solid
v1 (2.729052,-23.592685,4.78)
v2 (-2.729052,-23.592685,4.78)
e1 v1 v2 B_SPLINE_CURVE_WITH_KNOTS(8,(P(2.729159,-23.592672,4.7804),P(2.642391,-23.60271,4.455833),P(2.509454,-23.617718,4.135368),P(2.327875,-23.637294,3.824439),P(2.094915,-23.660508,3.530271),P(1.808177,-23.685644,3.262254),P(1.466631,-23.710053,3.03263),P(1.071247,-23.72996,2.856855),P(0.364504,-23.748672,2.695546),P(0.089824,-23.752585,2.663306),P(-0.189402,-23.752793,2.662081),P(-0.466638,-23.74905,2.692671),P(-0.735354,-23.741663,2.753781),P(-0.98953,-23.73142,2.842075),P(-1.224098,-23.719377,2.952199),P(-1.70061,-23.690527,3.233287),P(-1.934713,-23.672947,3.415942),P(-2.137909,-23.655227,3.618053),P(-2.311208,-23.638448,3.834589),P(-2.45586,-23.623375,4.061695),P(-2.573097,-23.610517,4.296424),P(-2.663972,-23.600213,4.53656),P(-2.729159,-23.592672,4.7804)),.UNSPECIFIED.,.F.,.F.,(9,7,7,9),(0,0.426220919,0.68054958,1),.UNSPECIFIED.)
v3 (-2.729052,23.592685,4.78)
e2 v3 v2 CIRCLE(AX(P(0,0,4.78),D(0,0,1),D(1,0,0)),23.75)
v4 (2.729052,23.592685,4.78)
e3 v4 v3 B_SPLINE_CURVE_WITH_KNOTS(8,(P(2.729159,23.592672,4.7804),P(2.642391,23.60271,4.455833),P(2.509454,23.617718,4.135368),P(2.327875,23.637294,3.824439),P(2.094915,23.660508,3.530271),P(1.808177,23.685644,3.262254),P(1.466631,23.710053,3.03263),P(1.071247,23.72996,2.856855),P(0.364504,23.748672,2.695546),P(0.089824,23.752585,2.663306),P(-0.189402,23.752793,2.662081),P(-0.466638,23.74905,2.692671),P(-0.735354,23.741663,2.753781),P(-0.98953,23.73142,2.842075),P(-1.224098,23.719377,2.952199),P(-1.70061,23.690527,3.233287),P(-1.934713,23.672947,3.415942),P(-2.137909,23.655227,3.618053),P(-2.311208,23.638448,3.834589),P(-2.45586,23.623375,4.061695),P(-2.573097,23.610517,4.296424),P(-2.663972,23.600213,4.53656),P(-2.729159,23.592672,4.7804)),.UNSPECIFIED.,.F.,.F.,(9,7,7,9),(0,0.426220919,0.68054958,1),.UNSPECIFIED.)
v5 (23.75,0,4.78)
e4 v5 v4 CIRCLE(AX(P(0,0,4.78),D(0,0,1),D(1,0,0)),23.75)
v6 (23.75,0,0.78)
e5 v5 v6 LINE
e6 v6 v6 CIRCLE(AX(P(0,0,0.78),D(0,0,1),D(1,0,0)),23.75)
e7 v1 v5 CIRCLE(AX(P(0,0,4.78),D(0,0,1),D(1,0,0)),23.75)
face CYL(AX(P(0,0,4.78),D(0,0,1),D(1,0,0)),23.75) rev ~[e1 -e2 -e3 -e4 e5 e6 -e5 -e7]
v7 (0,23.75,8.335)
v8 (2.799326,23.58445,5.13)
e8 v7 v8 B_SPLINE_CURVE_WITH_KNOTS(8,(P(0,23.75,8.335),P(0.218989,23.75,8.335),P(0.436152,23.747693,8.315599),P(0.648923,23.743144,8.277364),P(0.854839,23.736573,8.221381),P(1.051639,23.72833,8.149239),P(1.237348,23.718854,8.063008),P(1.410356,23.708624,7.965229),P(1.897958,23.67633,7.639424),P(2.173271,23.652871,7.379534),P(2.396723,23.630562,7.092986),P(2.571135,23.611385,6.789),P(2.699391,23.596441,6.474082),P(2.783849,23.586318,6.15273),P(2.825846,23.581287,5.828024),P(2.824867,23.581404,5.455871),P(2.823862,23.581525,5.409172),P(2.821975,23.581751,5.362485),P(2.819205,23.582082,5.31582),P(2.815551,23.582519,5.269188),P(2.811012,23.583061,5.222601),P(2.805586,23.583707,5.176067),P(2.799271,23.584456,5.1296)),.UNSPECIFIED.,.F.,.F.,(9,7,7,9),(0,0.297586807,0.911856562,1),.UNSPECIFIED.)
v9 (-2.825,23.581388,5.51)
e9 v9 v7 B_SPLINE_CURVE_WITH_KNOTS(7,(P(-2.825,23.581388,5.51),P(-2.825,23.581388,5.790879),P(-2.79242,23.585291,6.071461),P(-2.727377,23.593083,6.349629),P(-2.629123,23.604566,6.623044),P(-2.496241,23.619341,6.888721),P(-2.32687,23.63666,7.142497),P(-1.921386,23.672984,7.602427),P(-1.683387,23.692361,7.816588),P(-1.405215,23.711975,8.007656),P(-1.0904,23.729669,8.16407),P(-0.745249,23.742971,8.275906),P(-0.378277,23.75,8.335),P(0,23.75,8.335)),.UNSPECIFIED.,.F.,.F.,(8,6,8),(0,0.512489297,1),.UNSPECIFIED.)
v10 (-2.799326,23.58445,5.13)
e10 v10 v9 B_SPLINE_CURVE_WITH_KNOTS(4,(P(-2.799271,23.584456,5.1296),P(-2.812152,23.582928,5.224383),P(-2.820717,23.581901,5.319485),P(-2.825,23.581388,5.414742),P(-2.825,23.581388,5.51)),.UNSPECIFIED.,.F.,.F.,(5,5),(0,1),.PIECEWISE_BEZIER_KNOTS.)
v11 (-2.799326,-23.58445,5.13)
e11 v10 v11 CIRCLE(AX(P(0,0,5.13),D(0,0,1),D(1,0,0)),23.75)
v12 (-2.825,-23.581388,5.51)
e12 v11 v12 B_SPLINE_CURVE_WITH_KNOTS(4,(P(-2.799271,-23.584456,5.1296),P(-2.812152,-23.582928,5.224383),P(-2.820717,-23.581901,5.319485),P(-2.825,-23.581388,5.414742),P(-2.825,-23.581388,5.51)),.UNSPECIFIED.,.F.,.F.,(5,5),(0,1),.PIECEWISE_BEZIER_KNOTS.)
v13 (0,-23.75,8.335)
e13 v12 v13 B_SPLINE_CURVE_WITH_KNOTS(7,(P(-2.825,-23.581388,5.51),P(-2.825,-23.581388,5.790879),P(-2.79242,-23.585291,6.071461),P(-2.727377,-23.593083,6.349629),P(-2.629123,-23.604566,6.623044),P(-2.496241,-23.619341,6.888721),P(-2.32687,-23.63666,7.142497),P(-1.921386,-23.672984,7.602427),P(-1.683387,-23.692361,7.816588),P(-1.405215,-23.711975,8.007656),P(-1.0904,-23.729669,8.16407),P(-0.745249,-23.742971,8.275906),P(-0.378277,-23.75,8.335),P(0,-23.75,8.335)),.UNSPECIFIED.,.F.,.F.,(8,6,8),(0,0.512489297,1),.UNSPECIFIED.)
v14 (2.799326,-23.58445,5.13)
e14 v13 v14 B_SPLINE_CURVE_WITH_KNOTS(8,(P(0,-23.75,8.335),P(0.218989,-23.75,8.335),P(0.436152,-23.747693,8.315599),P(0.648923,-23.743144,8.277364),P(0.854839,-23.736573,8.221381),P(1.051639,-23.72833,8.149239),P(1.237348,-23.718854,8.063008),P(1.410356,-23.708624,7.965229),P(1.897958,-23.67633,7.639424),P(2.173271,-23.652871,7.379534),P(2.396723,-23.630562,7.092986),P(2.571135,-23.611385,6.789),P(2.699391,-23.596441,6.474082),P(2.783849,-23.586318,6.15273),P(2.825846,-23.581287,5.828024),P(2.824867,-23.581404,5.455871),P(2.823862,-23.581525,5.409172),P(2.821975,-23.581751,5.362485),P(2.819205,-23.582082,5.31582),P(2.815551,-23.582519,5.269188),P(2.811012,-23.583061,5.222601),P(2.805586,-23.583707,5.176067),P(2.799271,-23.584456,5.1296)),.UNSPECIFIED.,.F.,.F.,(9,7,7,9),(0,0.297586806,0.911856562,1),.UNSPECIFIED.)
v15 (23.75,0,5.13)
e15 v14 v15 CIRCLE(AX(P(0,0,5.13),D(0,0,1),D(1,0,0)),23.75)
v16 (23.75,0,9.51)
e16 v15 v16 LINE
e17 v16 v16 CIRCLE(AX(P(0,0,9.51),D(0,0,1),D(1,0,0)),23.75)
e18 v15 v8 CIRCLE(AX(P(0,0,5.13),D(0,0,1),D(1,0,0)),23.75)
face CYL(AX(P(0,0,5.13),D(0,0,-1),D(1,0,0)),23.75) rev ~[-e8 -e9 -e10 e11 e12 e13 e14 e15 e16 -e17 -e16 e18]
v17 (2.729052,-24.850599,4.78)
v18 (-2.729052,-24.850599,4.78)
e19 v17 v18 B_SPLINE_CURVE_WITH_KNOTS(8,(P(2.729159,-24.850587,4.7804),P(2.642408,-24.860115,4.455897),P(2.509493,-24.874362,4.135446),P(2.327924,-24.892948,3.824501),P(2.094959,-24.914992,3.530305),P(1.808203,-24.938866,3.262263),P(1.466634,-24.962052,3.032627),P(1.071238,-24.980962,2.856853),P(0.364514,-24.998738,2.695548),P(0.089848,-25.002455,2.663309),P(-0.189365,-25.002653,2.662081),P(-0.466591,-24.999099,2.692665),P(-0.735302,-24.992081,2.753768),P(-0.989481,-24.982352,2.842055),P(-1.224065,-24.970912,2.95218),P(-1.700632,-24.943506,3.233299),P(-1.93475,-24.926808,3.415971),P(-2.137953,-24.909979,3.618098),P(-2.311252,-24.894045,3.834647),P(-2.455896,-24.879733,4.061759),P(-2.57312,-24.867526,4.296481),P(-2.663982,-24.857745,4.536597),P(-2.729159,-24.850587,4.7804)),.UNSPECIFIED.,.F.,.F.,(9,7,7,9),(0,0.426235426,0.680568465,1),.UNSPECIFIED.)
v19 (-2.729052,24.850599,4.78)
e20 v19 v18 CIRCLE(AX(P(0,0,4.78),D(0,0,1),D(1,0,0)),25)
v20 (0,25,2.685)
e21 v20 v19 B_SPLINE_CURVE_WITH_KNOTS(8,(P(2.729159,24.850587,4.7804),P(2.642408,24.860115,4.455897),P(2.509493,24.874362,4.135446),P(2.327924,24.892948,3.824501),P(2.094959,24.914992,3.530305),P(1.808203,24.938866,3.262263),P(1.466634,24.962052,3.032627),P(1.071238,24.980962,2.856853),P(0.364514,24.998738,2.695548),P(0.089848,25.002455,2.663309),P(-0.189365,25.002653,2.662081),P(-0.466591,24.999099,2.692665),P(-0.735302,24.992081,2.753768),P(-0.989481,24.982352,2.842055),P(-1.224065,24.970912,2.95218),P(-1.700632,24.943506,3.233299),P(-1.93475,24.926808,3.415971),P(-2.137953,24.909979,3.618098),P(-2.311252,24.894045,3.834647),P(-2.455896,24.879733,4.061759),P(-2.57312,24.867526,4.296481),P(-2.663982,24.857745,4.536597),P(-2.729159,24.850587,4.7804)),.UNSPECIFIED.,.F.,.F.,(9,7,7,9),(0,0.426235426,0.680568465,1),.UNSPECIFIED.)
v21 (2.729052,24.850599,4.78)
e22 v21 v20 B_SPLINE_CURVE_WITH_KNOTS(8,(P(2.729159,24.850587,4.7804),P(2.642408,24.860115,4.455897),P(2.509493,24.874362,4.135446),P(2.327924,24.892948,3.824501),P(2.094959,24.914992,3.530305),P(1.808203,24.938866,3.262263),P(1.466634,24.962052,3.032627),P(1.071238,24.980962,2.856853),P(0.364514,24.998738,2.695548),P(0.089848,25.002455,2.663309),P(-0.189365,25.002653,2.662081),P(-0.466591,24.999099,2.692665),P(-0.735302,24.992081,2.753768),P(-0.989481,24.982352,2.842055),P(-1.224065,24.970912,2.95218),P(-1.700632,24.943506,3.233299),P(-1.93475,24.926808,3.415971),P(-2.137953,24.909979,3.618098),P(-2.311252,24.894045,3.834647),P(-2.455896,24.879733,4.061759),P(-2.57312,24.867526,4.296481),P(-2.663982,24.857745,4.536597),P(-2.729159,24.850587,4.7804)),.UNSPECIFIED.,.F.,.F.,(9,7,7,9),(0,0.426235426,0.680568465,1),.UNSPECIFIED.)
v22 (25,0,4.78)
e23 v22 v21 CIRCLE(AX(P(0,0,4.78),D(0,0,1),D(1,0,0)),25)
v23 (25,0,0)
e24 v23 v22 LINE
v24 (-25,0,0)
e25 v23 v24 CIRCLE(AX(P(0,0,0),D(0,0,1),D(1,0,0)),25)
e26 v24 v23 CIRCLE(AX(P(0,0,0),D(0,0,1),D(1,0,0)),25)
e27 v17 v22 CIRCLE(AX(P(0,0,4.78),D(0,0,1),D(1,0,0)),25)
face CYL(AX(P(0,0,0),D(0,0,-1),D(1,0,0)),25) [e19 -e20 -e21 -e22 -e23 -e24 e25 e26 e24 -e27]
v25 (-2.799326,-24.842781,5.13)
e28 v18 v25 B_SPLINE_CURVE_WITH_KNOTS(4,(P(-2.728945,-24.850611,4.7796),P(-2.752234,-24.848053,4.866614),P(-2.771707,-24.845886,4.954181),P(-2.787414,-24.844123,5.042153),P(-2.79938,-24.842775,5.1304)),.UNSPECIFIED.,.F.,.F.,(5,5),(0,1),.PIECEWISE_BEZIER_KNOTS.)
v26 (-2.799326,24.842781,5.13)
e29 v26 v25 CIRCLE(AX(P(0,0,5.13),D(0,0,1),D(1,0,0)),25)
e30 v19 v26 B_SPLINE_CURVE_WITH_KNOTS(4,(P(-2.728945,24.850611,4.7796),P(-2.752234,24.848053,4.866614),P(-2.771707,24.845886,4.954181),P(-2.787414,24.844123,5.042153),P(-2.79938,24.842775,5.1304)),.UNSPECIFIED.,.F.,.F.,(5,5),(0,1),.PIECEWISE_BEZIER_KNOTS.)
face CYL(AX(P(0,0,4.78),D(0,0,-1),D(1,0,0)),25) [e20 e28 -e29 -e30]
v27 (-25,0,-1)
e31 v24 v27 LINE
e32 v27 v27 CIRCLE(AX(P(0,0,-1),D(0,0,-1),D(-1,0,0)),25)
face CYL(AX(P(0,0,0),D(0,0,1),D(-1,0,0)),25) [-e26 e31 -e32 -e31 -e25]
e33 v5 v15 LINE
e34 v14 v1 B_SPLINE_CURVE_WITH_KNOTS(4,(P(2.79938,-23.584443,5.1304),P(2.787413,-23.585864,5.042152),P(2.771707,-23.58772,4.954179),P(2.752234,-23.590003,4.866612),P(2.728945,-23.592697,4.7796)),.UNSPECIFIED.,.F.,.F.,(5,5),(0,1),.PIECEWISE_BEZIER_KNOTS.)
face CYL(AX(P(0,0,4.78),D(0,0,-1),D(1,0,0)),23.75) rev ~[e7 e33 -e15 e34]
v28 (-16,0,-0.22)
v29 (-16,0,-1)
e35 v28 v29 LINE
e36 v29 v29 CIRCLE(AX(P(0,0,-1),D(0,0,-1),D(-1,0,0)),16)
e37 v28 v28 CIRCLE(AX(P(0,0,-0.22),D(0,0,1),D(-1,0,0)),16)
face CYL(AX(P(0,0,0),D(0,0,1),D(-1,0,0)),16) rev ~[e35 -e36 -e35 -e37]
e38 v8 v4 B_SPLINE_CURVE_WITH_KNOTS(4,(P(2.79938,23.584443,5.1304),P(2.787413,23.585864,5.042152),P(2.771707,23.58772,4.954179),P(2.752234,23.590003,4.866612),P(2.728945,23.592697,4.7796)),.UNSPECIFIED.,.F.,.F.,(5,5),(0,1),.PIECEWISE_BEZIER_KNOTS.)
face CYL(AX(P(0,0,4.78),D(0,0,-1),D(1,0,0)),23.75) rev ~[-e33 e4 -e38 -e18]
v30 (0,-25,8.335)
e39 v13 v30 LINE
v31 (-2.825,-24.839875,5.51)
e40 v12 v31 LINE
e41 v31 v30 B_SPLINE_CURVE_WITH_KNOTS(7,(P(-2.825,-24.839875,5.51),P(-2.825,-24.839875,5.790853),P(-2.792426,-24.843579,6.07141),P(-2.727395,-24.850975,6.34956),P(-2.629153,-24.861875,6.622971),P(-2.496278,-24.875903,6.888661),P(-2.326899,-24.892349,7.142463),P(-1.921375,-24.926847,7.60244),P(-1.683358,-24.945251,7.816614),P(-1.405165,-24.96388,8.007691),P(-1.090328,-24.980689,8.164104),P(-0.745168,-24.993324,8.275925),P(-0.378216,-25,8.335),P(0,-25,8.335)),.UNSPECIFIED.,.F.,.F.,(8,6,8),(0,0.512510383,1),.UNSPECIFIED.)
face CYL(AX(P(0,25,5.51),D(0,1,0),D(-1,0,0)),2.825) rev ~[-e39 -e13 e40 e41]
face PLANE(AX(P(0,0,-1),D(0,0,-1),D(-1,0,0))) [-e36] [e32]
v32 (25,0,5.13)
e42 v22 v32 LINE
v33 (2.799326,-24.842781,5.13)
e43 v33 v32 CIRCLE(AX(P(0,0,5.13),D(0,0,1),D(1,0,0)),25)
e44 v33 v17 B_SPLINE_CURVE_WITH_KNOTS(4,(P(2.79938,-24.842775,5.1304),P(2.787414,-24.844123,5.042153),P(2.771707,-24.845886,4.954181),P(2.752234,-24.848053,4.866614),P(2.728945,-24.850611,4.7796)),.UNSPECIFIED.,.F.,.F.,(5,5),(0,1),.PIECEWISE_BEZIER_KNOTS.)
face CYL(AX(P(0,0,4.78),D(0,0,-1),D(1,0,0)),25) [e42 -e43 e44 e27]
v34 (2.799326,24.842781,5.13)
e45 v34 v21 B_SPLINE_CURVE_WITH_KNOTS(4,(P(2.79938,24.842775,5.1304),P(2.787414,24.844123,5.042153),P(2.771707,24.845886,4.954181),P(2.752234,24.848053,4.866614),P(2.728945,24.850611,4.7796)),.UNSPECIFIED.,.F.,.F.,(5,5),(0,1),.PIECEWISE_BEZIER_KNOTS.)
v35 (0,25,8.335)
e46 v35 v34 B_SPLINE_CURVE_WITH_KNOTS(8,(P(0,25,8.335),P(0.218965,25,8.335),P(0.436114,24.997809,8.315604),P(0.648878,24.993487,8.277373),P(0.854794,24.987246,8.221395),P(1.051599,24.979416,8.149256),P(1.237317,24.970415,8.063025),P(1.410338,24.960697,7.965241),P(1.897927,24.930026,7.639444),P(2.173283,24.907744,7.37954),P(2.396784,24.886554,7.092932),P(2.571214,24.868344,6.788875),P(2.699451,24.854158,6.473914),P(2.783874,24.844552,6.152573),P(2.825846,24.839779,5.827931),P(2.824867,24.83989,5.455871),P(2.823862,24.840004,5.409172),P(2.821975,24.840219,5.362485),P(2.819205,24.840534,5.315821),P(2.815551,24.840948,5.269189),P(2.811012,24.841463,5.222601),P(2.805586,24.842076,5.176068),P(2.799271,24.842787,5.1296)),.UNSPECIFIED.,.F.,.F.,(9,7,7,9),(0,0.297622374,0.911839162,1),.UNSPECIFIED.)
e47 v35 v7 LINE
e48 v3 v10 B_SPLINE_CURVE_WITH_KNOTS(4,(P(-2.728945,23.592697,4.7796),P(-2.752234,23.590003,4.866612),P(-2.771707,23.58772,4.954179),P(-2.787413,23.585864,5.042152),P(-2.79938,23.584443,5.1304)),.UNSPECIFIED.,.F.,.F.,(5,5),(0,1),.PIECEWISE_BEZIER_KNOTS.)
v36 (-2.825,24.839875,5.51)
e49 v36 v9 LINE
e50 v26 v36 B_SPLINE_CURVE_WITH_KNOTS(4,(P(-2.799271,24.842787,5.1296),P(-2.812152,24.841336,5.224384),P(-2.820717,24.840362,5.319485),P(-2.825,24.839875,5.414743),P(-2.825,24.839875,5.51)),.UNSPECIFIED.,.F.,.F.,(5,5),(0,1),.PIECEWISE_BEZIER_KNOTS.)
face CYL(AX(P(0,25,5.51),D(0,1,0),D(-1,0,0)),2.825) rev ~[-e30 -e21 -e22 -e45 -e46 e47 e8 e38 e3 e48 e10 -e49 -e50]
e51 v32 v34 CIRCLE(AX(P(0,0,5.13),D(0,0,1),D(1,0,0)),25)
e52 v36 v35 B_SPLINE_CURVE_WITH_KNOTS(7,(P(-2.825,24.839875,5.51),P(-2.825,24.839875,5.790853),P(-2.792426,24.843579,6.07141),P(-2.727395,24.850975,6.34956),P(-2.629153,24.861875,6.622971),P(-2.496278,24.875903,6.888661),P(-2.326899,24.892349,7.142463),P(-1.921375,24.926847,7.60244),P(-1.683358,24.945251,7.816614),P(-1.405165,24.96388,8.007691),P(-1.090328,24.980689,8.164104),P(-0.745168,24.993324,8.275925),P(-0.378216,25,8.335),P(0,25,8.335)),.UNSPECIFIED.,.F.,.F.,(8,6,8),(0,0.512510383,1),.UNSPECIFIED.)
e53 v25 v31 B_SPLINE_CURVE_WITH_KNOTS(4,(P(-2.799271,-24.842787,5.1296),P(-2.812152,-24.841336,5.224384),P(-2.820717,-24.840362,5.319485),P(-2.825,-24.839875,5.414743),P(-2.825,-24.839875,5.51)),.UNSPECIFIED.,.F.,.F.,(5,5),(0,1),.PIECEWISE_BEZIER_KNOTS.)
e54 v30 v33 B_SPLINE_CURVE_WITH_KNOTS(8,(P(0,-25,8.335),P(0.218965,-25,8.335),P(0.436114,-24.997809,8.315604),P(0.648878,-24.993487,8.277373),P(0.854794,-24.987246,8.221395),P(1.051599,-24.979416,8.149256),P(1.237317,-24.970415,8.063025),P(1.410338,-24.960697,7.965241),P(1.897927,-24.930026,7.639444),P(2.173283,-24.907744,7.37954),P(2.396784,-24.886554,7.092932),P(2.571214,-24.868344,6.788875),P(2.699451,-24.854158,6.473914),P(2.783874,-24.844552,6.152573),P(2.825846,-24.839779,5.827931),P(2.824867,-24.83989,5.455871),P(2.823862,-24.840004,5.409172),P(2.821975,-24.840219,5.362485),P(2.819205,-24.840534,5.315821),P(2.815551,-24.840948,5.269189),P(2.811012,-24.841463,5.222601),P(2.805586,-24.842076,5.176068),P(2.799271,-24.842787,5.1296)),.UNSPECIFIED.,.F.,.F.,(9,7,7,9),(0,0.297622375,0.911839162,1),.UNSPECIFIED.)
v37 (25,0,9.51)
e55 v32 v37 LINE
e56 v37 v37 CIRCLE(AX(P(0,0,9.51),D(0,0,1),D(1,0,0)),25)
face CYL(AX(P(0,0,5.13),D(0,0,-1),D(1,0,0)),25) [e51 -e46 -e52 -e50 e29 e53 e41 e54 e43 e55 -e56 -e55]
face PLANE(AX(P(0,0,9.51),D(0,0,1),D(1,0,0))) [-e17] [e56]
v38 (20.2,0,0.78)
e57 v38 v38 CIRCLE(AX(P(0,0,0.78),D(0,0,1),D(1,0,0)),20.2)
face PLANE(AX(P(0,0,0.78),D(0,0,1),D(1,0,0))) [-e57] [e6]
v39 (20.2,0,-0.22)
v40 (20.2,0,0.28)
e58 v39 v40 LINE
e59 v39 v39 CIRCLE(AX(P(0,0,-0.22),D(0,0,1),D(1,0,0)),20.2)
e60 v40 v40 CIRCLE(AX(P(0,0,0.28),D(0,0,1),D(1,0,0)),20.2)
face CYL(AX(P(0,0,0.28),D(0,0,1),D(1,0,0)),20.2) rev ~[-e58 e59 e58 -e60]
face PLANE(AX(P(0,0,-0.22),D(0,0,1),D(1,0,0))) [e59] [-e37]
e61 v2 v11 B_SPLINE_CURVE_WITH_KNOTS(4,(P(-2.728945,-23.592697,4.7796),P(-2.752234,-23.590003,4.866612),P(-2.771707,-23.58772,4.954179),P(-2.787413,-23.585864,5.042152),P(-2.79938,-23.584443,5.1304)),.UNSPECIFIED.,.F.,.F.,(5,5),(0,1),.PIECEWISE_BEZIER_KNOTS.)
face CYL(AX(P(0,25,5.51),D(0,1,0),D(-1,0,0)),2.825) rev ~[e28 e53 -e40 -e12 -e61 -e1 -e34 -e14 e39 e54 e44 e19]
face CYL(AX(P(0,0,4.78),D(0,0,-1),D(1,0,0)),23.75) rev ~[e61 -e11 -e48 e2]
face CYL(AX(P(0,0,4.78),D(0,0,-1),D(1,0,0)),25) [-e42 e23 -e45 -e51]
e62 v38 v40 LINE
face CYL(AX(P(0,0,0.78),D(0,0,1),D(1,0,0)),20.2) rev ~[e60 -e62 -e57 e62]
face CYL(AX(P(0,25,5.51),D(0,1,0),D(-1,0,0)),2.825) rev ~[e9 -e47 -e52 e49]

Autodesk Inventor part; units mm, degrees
ref_plane "YZ Plane" through (0, 0, 0) normal (1, 0, 0) x (0, 1, 0)
ref_plane "XY Plane" through (0, 0, 0) normal (0, 0, 1) x (1, 0, 0)
sketch "Sketch1" plane through (0, 0, 0) normal (0, 0, 1) x (1, 0, 0)
  circle A0 centre (0, 0) radius 25
  dimension "d0" = 50
extrude "Initial Cylinder" add sketch "Sketch1" along normal blind 4.78
sketch "Sketch2" plane through (0, 0, 4.78) normal (0, 0, 1) x (1, 0, 0)
  circle A0 centre (0, 0) radius 16
  dimension "d3" = 32
extrude "Through-hole" cut sketch "Sketch2" against normal blind 548
sketch "Sketch3" plane through (0, 0, 4.78) normal (0, 0, 1) x (1, 0, 0)
  circle A0 centre (0, 0) radius 23.75
  dimension "d6" = 47.5
extrude "snug ring fit" cut sketch "Sketch3" against normal blind 4
sketch "Sketch5" plane through (0, 0, 0) normal (0, 1, 0) x (-1, 0, 0)
  line L0 (25, 4.78) -> (-25, 4.78) projected
  line L1 (25, 0) -> (-25, 0) projected
  point P0 (0, 0)
  dimension "d16" = 4.78
sketch "Sketch6" plane through (0, 0, 0.78) normal (0, 0, 1) x (1, 0, 0)
  circle A0 centre (0, 0) radius 20.2
  dimension "d17" = 40.4
extrude "Extrusion5" cut sketch "Sketch6" against normal blind 0.5
sketch "Sketch7" plane through (0, 0, 0) normal (0, 0, -1) x (-1, 0, 0)
  circle A0 centre (0, 0) radius 16 projected
  circle A1 centre (0, 0) radius 25 projected
extrude "Extrusion6" add sketch "Sketch7" along normal blind 1
sketch "Sketch8" plane through (0, 0, 0.28) normal (0, 0, 1) x (1, 0, 0)
  circle A0 centre (0, 0) radius 16 projected
  circle A1 centre (0, 0) radius 20.2 projected
  circle A2 centre (0, 0) radius 17.75
  dimension "d26" = 35.5
extrude "Extrusion7" cut sketch "Sketch8" along normal mid plane 1 contours A0 | A1 | A2
sketch "Sketch9" plane through (0, 0, 4.78) normal (0, 0, 1) x (1, 0, 0)
  circle A0 centre (0, 0) radius 23.75 projected
  circle A1 centre (0, 0) radius 25 projected
extrude "Extrusion8" add sketch "Sketch9" along normal blind 0.35
sketch "Sketch10" plane through (0, 0, 5.13) normal (0, 0, 1) x (1, 0, 0)
  circle A0 centre (0, 0) radius 23.75 projected
  circle A1 centre (0, 0) radius 25 projected
  dimension "d30" = 1.25
extrude "Extrusion9" add sketch "Sketch10" along normal blind 4.38
sketch "Sketch4" plane through (0, 0, 0) normal (0, 1, 0) x (-1, 0, 0)
  line L0 (25, 4.78) -> (-25, 4.78) projected
  line L1 (0, 4.78) -> (0, 5.78)
  circle A0 centre (0, 5.78) radius 2.825
  point P0 (0, 0)
  dimension "d10" = 5.65
  dimension "d29" = 1
extrude "Extrusion4" [suppressed]
ref_plane "Work Plane1" through (0, 25, 0) normal (0, 1, 0) x (-1, 0, 0)
sketch "Sketch11" plane through (0, 25, 0) normal (0, 1, 0) x (-1, 0, 0)
  line L0 (16, -0.22) -> (-16, -0.22) projected
  line L1 (25, 9.51) -> (-25, 9.51) projected
  line L2 (-23.75, 9.51) -> (23.75, 9.51) projected
  line L3 (0, 9.51) -> (0, 5.51)
  circle A0 centre (0, 5.51) radius 2.825
  point P0 (0, 0)
  dimension "d32" = 9.73
  dimension "d33" = 4
  dimension "d34" = 5.65
extrude "Extrusion10" cut sketch "Sketch11" along normal mid plane 1000
properties part number "Diaphragm_lock"
